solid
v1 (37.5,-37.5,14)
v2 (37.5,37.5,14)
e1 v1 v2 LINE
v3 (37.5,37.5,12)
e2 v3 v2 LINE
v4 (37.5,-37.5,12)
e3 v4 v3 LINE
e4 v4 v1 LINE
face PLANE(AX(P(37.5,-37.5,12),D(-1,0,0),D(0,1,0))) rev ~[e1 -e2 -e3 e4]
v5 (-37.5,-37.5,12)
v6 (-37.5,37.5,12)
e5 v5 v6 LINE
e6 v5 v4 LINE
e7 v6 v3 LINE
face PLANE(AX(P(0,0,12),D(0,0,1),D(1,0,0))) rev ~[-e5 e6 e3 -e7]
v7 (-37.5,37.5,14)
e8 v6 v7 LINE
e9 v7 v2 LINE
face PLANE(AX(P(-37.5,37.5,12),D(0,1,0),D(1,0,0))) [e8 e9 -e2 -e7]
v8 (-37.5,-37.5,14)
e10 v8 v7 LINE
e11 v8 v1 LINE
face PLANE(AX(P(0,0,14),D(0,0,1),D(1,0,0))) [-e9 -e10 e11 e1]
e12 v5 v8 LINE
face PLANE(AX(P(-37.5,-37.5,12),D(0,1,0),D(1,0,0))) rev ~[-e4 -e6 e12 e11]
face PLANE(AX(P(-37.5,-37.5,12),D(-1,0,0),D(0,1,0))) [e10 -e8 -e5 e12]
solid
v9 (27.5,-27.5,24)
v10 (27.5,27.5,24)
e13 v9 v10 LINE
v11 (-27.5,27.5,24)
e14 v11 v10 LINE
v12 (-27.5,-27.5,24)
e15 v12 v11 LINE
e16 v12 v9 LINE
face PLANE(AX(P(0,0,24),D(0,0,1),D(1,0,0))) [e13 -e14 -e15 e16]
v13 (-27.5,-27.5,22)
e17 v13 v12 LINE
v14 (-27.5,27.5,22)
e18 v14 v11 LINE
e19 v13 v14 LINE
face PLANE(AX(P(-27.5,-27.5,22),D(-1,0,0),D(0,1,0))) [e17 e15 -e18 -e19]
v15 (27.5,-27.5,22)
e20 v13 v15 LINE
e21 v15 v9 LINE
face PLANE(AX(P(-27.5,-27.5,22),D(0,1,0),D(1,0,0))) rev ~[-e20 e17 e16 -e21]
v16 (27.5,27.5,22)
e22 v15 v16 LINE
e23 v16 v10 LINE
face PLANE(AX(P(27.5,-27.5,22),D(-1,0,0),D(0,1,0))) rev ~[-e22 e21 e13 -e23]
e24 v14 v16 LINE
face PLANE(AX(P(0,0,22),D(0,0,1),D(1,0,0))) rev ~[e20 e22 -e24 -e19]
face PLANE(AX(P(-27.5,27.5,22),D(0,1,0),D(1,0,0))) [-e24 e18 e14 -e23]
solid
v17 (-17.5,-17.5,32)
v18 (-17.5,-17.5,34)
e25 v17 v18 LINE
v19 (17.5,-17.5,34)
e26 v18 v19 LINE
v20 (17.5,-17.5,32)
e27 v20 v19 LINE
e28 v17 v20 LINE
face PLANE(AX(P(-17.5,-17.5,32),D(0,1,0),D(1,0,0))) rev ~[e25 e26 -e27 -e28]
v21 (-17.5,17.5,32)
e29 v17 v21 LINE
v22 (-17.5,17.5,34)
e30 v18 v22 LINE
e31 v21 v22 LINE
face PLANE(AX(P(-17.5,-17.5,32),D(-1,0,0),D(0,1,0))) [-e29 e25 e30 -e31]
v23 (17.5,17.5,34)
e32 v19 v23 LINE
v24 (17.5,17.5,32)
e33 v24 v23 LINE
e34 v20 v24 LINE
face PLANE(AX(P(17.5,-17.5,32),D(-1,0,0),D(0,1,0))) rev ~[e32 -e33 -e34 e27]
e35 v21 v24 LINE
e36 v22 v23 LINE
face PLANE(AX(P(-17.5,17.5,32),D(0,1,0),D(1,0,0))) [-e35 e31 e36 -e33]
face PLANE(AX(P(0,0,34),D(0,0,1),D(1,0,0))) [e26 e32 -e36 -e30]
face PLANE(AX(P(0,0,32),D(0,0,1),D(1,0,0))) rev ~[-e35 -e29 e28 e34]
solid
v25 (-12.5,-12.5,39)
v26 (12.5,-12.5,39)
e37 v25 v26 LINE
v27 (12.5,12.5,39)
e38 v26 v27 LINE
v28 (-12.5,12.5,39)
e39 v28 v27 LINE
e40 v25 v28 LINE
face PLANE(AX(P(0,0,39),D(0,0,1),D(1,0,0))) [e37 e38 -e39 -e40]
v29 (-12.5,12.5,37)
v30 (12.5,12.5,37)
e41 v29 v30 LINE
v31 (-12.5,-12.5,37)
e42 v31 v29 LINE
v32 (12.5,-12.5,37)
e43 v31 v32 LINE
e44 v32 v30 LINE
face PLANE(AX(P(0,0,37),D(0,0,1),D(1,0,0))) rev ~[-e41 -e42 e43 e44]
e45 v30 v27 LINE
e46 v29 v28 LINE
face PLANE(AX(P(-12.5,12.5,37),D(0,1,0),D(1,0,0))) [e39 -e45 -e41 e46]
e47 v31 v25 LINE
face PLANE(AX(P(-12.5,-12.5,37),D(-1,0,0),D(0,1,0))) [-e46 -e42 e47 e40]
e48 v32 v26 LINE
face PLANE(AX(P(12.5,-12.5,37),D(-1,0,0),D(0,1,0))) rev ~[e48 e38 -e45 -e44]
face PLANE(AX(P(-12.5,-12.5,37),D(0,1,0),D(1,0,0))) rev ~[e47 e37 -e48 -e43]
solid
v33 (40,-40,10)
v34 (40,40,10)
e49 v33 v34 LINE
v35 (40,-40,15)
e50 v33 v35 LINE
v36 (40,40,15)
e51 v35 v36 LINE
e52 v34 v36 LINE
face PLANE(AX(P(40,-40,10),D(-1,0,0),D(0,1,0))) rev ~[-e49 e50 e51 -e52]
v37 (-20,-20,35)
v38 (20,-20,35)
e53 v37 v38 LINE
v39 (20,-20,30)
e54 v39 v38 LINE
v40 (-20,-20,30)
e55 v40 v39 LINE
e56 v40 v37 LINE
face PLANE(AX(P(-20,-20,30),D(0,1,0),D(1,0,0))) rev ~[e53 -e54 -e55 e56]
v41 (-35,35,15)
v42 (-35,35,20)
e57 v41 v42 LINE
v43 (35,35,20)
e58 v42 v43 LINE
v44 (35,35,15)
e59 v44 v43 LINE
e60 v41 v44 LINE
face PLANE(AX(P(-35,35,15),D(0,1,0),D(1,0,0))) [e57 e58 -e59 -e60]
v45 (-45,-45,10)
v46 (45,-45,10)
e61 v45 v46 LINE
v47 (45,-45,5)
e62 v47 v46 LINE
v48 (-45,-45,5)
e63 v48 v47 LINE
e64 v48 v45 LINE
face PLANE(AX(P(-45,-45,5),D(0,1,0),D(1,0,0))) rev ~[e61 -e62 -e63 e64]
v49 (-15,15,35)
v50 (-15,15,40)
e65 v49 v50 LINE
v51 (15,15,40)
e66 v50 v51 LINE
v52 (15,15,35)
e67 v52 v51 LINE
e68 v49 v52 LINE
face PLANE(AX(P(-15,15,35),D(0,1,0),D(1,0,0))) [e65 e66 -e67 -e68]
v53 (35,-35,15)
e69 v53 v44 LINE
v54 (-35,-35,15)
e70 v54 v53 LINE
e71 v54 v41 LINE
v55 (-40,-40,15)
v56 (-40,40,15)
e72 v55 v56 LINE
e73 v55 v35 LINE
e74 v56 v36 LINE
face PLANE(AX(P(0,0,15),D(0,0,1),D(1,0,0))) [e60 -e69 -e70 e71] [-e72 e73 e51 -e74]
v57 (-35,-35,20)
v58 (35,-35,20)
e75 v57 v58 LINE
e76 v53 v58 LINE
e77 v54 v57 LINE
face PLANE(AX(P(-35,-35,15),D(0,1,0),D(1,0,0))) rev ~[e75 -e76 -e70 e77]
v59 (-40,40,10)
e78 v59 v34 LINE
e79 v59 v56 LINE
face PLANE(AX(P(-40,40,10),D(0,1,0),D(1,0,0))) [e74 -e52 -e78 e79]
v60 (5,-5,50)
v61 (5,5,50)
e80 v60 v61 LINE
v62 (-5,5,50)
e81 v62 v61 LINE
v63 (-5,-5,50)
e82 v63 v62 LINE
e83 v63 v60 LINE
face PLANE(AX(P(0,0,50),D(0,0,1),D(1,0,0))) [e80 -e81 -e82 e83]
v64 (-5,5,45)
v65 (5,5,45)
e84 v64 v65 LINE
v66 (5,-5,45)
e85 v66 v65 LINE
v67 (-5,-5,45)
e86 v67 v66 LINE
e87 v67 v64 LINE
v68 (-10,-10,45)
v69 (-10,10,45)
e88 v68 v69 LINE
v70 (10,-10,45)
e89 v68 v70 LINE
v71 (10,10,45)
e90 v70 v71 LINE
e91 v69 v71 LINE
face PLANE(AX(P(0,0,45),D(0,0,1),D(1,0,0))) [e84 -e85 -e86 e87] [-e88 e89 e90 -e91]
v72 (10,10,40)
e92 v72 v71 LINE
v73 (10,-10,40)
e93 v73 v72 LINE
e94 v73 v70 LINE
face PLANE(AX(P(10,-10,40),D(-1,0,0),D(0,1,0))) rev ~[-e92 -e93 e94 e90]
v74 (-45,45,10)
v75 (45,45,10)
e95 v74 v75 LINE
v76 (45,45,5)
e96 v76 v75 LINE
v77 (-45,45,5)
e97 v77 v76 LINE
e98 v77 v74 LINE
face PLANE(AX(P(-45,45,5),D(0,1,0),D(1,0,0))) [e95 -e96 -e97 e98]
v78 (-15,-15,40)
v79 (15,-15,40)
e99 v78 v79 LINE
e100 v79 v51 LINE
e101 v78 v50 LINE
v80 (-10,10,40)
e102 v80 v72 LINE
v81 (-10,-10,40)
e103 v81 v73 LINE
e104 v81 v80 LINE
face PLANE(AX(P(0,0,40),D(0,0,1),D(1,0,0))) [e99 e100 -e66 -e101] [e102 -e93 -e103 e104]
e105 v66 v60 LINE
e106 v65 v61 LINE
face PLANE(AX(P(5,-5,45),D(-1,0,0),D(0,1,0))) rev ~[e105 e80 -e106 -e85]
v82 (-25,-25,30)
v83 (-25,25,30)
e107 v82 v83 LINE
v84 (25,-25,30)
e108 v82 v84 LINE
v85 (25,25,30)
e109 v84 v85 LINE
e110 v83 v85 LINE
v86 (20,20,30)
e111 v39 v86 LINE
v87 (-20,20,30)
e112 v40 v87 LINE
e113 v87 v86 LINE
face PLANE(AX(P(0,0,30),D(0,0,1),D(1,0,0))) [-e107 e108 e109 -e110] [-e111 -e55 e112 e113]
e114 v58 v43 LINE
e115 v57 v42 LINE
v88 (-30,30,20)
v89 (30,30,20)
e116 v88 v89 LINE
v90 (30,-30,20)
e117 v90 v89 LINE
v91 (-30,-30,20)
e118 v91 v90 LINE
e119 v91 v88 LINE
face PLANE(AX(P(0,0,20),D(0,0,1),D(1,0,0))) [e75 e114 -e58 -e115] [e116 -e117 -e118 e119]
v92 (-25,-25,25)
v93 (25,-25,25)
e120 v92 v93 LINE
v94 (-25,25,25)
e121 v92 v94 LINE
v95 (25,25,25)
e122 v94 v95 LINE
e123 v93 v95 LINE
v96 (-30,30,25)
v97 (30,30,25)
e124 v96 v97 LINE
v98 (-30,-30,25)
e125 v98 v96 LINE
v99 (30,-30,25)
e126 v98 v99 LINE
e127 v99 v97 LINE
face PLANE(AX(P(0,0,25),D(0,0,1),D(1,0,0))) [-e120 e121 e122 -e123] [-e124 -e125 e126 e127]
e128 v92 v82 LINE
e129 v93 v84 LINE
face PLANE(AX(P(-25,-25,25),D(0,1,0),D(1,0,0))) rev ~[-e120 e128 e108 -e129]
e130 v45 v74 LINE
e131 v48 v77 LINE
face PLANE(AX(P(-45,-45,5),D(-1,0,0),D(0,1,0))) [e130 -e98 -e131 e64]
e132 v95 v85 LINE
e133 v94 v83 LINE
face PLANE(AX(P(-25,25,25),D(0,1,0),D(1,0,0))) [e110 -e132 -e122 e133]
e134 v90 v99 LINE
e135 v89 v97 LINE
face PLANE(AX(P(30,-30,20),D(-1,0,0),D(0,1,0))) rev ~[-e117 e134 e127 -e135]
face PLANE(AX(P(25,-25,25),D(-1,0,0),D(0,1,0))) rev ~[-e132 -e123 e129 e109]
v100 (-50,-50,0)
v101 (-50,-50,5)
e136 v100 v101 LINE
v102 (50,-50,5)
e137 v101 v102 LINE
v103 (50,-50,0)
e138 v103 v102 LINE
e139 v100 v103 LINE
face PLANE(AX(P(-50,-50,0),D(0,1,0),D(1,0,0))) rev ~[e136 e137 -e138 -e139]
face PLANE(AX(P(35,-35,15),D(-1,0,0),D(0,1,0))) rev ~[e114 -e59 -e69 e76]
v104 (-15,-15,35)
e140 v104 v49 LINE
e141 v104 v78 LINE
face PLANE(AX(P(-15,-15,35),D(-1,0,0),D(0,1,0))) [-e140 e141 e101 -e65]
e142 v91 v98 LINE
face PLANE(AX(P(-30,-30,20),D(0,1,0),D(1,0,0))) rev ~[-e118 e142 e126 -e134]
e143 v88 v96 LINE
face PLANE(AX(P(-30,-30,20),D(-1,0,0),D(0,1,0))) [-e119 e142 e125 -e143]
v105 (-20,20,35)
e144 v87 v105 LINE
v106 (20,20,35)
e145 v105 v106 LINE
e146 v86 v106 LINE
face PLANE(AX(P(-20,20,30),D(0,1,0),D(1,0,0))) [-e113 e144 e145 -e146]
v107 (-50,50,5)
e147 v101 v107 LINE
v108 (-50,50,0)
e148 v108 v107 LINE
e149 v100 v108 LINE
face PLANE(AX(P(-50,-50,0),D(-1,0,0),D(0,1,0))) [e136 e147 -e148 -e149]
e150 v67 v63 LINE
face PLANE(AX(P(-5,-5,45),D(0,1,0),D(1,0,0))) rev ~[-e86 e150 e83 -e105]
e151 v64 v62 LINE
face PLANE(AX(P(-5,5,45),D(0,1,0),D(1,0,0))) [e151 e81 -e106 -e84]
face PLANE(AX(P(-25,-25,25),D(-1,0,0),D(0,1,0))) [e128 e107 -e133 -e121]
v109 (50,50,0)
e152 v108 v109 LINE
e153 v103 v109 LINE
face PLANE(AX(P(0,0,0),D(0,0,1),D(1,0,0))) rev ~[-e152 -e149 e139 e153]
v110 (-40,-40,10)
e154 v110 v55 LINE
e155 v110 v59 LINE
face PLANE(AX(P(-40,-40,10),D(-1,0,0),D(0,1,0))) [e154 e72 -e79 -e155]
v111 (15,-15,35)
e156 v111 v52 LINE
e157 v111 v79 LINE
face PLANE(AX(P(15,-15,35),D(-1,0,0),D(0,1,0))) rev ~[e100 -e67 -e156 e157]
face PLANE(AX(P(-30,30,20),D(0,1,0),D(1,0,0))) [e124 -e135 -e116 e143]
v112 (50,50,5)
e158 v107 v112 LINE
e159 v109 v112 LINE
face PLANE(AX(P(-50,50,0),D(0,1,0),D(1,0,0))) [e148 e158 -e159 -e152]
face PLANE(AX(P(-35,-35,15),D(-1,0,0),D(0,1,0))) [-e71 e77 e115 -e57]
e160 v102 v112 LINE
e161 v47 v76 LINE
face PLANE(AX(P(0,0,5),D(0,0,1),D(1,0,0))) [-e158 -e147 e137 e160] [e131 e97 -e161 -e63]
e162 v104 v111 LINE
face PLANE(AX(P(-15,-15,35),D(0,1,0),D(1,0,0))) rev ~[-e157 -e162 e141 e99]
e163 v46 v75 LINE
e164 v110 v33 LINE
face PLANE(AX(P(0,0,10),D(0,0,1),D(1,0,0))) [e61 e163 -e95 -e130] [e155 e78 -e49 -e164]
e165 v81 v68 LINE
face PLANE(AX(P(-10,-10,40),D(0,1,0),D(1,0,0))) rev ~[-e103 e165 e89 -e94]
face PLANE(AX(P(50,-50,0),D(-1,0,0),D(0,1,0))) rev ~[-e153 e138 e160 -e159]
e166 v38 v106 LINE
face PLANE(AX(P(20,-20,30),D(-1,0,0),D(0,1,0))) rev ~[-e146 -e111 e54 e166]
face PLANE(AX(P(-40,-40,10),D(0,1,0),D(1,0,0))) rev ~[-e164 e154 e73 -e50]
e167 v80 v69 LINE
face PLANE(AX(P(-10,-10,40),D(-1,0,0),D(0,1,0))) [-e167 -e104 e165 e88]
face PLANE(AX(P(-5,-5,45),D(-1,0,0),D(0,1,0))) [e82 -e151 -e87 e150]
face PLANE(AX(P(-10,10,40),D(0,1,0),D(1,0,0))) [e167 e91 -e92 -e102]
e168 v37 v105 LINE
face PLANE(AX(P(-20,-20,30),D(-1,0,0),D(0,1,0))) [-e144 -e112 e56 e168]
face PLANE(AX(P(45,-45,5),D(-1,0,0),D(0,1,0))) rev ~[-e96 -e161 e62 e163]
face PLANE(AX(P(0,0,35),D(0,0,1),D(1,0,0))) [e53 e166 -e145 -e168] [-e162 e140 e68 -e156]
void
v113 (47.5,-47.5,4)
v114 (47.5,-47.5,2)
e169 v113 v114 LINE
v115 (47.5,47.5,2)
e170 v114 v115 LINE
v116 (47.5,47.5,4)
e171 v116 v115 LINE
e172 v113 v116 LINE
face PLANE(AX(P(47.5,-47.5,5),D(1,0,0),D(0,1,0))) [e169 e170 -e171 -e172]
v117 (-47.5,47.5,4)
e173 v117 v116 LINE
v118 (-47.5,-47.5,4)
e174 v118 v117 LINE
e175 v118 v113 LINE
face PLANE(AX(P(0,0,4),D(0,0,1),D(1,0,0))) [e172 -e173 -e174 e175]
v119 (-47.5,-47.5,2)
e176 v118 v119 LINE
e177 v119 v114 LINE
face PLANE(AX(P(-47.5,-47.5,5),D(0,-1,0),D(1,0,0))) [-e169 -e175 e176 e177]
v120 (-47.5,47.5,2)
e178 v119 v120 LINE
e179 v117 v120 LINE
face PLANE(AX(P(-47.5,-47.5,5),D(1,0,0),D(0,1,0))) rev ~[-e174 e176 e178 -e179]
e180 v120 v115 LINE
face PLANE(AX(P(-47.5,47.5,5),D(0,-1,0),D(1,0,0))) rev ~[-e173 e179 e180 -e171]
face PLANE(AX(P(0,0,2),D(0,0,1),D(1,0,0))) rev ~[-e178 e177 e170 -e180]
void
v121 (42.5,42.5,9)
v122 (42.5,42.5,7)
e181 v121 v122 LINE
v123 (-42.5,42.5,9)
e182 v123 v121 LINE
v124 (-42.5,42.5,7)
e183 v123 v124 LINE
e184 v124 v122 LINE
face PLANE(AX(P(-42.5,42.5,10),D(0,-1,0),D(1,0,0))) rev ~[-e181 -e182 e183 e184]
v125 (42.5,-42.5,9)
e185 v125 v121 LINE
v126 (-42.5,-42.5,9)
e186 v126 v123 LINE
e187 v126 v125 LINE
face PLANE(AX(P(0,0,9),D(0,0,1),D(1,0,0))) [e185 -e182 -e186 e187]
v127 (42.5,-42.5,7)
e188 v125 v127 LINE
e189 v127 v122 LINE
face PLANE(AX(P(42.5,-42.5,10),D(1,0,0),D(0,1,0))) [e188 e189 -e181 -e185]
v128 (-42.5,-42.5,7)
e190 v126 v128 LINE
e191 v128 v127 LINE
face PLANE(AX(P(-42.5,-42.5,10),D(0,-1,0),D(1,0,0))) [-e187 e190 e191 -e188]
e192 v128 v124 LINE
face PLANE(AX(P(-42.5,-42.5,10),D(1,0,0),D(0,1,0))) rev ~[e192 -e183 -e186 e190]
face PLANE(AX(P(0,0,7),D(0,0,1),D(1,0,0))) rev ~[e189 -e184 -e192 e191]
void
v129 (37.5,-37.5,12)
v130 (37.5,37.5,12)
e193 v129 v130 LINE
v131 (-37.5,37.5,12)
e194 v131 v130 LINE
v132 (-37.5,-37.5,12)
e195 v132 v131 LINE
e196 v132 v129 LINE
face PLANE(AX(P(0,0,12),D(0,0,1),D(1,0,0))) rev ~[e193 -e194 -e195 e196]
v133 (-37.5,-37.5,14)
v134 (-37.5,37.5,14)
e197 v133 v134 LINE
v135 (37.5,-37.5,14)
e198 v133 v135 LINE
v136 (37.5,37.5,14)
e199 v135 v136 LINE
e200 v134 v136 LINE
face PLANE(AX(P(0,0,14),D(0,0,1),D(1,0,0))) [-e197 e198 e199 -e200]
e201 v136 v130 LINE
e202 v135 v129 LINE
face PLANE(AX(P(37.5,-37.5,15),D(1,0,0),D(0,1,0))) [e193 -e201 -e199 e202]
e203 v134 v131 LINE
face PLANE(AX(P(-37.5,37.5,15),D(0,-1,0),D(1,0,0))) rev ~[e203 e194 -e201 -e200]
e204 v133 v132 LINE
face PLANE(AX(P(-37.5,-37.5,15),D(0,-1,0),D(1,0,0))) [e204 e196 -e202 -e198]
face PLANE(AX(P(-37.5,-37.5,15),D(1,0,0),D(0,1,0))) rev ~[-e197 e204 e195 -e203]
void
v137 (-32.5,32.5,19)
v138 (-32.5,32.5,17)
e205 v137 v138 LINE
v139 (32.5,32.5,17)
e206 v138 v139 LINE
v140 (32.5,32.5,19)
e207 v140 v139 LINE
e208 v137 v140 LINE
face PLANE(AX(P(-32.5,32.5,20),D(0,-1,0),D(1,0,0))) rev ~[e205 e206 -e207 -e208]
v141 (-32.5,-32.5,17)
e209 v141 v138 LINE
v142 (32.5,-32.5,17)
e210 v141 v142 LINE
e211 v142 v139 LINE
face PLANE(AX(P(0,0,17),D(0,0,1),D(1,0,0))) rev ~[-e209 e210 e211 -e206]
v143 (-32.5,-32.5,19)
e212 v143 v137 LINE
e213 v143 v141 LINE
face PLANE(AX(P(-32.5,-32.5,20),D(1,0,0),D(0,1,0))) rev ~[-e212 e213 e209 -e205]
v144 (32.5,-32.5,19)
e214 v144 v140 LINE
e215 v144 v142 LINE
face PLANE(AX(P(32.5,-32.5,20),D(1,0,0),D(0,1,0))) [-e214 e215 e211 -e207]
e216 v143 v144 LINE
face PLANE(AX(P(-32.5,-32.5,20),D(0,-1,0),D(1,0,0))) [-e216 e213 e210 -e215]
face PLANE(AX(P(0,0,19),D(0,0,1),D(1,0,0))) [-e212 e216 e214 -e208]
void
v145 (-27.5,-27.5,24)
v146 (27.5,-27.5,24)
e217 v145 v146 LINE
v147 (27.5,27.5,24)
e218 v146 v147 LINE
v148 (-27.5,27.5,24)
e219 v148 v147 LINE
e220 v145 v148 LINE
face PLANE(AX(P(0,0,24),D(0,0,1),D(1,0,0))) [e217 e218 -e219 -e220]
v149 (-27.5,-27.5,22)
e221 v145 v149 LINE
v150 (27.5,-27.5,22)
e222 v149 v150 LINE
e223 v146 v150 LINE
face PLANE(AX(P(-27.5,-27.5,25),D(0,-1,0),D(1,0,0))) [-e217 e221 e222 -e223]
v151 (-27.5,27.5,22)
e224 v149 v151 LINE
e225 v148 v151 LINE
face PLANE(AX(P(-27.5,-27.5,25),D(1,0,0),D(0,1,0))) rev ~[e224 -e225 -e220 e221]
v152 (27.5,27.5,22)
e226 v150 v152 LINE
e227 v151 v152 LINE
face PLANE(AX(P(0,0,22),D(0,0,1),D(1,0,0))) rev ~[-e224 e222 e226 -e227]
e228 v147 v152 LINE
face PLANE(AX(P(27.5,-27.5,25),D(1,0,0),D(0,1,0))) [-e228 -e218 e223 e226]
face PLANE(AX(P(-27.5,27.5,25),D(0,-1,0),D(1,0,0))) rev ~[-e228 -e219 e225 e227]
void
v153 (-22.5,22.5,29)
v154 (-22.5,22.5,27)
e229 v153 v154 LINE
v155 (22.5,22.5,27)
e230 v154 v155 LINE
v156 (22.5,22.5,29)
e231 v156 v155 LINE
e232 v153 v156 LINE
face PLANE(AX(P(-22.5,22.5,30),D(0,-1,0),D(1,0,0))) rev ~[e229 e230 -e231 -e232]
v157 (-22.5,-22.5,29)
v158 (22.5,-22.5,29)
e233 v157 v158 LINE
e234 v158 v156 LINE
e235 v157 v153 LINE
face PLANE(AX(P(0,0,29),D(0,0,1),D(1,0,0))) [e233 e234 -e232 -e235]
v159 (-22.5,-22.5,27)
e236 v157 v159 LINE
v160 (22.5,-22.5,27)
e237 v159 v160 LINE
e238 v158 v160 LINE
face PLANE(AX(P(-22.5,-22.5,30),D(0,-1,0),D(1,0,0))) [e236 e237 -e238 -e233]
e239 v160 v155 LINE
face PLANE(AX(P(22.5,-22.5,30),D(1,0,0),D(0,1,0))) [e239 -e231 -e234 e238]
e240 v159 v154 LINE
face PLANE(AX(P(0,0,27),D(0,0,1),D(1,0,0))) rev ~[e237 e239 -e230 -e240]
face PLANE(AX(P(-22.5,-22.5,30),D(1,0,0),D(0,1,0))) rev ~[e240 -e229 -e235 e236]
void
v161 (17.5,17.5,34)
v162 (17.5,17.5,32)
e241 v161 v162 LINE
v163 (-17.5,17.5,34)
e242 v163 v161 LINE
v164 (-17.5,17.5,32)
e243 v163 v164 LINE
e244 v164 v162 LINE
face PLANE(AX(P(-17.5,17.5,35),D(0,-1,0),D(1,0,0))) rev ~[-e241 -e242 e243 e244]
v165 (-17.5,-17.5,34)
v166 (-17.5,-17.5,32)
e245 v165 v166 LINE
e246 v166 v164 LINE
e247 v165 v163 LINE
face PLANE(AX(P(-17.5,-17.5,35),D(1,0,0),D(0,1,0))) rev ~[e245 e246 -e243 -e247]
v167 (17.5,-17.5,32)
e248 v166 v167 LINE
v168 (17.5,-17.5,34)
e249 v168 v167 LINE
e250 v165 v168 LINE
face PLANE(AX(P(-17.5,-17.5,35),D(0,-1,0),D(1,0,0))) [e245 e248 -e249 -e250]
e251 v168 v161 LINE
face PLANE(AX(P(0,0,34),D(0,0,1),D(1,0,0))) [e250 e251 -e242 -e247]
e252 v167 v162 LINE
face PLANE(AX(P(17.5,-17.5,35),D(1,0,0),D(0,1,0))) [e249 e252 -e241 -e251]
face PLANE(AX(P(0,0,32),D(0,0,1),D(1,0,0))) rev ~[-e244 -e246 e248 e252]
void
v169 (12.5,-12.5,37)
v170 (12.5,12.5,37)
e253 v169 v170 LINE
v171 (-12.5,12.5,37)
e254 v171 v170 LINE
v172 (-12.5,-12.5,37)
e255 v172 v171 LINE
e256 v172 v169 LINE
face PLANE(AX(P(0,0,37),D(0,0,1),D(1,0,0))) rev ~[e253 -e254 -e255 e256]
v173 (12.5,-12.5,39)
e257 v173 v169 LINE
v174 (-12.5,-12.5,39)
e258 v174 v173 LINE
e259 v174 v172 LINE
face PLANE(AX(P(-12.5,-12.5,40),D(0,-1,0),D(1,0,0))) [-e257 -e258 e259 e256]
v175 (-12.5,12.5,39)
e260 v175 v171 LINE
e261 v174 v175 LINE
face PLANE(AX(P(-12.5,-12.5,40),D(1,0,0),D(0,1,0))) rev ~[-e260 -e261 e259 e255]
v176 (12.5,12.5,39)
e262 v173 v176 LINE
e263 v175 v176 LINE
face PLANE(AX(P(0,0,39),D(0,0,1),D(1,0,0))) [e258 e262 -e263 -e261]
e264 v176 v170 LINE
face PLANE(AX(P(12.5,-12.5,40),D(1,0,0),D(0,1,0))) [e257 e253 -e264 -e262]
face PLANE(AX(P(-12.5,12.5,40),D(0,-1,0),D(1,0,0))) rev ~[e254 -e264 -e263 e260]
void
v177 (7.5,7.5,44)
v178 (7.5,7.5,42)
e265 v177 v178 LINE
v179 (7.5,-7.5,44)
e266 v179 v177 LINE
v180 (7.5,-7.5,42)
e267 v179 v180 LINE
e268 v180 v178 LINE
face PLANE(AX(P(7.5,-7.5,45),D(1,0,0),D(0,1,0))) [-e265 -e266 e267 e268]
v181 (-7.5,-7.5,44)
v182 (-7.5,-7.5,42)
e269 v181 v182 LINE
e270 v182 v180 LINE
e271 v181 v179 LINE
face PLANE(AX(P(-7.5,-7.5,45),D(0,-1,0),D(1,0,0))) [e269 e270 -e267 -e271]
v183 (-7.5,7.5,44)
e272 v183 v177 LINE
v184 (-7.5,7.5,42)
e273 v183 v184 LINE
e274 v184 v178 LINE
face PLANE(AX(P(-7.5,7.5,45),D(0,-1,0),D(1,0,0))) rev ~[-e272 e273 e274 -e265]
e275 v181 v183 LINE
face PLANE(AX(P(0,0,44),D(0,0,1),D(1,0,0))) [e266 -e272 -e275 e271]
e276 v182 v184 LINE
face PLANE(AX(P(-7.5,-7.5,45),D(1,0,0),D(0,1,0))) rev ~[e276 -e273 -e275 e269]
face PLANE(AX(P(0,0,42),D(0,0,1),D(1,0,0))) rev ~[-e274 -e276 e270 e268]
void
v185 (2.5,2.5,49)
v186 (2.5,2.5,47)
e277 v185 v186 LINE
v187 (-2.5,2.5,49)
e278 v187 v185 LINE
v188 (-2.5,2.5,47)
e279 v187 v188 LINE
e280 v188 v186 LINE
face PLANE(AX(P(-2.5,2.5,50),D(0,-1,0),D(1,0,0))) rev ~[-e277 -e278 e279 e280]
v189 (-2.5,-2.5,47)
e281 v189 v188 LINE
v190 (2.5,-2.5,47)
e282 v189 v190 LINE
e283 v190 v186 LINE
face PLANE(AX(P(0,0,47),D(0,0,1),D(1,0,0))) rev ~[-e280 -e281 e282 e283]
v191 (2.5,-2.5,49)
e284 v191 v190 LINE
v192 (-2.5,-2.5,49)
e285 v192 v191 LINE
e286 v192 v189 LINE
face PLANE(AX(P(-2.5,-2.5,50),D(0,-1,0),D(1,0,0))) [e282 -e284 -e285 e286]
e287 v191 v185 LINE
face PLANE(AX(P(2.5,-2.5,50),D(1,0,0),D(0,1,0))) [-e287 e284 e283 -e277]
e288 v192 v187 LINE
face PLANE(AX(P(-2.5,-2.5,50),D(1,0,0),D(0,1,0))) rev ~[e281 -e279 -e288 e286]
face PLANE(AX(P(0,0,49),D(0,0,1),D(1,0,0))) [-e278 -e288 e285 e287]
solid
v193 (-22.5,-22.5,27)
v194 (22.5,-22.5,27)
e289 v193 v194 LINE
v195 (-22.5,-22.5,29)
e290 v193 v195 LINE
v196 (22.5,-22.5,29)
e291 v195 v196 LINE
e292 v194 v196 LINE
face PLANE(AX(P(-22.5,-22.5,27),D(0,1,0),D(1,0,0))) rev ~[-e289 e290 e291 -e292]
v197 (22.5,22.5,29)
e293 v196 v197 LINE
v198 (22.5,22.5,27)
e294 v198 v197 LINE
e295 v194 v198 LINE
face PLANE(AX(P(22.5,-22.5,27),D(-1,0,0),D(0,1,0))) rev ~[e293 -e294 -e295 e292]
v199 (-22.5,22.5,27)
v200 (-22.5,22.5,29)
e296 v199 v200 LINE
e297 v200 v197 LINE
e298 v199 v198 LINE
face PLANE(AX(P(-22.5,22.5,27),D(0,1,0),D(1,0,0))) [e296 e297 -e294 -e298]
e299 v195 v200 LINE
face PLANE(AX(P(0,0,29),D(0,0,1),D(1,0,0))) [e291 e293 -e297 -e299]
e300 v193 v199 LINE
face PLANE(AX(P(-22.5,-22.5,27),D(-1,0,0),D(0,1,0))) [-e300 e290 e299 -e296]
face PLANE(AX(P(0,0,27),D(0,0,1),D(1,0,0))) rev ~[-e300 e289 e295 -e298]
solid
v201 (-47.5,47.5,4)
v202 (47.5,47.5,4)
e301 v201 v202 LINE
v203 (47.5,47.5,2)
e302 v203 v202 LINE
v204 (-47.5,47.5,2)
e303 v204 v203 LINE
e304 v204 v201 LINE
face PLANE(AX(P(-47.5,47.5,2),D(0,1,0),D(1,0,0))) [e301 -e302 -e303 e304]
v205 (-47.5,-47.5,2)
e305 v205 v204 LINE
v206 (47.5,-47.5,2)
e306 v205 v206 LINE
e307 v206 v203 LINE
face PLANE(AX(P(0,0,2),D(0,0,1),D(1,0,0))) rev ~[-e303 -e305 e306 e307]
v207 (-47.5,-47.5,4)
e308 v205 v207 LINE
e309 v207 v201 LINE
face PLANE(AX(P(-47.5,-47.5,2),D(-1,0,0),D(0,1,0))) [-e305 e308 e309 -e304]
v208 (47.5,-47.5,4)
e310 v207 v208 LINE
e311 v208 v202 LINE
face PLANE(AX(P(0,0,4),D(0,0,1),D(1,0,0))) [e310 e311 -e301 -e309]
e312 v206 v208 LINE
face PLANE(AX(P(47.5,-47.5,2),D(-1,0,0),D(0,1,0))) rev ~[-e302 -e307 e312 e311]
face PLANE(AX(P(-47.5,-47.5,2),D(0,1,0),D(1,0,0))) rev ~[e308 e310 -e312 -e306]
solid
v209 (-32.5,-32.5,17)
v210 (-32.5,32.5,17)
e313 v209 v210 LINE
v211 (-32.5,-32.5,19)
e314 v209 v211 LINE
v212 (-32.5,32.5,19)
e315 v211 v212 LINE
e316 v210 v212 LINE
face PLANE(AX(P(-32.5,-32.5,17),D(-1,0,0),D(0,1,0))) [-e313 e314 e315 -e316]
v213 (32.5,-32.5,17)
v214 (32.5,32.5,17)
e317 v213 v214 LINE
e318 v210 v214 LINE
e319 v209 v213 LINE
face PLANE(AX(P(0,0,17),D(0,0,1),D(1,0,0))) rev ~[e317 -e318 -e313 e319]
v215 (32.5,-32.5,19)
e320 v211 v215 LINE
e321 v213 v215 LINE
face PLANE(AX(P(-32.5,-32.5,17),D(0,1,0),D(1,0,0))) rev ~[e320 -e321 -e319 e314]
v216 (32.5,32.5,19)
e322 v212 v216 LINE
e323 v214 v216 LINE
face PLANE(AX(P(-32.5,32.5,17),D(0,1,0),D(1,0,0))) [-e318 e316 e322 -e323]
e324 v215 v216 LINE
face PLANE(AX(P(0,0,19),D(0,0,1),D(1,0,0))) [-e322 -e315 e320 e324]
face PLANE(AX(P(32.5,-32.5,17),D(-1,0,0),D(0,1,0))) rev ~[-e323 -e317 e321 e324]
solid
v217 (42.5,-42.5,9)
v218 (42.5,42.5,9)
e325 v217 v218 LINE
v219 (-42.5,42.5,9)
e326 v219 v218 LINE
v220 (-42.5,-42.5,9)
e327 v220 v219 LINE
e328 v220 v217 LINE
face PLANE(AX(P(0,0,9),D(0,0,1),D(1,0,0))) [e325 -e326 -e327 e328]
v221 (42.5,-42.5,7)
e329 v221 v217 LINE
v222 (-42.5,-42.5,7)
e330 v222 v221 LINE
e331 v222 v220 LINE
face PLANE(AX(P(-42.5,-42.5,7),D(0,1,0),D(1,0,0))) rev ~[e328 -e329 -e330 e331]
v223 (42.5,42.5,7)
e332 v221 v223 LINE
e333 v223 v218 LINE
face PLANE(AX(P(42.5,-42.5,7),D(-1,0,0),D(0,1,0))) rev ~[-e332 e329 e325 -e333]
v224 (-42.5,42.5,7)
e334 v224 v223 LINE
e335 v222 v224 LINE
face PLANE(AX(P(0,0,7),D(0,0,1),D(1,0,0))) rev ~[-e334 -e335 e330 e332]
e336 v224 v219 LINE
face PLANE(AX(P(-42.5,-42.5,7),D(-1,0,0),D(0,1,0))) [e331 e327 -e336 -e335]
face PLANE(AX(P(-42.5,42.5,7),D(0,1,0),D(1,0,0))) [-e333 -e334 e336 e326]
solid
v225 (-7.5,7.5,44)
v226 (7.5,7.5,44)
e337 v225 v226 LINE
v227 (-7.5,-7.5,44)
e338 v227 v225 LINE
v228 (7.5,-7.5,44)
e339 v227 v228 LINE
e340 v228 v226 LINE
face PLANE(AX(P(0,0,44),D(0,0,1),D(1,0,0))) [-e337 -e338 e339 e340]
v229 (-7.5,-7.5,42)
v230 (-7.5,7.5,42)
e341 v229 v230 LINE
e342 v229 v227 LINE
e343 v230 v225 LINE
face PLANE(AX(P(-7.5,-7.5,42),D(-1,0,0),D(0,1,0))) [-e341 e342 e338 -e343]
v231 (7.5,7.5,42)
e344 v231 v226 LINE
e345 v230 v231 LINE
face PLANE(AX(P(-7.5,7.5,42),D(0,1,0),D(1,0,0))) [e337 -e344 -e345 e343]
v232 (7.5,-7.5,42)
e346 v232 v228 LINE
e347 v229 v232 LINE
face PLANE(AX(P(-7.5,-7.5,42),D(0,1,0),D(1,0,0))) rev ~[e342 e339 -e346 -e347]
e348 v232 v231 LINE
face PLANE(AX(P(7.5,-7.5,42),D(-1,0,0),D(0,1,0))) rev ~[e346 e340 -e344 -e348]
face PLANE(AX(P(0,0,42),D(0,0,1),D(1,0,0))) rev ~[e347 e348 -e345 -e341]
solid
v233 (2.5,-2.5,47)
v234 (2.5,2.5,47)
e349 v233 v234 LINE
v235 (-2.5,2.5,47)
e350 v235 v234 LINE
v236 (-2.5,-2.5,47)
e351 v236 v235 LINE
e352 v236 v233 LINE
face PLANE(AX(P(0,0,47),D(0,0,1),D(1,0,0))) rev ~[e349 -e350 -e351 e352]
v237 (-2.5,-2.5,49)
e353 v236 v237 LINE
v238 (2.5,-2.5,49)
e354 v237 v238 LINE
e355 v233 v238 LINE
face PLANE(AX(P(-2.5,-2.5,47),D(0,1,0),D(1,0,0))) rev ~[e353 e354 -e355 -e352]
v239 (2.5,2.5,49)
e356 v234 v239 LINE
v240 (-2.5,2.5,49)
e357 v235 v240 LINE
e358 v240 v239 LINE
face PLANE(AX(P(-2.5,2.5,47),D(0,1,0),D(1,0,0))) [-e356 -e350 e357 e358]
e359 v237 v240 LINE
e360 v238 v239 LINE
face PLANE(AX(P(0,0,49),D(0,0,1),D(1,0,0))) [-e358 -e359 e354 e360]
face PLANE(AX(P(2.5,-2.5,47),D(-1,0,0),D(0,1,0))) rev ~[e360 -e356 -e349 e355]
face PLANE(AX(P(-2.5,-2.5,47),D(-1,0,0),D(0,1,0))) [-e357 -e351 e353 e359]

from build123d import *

# Parameters (mm, degrees)
F0_W      = 100
F0_H      = 100
F1_DEPTH  = 5
F2_W      = 95
F2_H      = 95
F3_DEPTH  = 3
F4_W      = 95
F4_H      = 95
F5_DEPTH  = 2
F6_W      = 95
F6_H      = 95
F7_DEPTH  = 1
F8_W      = 90
F8_H      = 90
F9_DEPTH  = 5
F10_W     = 85
F10_H     = 85
F11_DEPTH = 3
F12_W     = 85
F12_H     = 85
F13_DEPTH = 2
F14_W     = 85
F14_H     = 85
F15_DEPTH = 1
F16_W     = 80
F16_H     = 80
F17_DEPTH = 5
F18_W     = 75
F18_H     = 75
F19_DEPTH = 3
F20_W     = 75
F20_H     = 75
F21_DEPTH = 2
F22_W     = 75
F22_H     = 75
F23_DEPTH = 1
F24_W     = 70
F24_H     = 70
F25_DEPTH = 5
F26_W     = 65
F26_H     = 65
F27_DEPTH = 3
F28_W     = 65
F28_H     = 65
F29_DEPTH = 2
F30_W     = 65
F30_H     = 65
F31_DEPTH = 1
F32_W     = 60
F32_H     = 60
F33_DEPTH = 5
F34_W     = 55
F34_H     = 55
F35_DEPTH = 3
F36_W     = 55
F36_H     = 55
F37_DEPTH = 2
F38_W     = 55
F38_H     = 55
F39_DEPTH = 1
F40_W     = 50
F40_H     = 50
F41_DEPTH = 5
F42_W     = 45
F42_H     = 45
F43_DEPTH = 3
F44_W     = 45
F44_H     = 45
F45_DEPTH = 2
F46_W     = 45
F46_H     = 45
F47_DEPTH = 1
F48_W     = 40
F48_H     = 40
F49_DEPTH = 5
F50_W     = 35
F50_H     = 35
F51_DEPTH = 3
F52_W     = 35
F52_H     = 35
F53_DEPTH = 2
F54_W     = 35
F54_H     = 35
F55_DEPTH = 1
F56_W     = 30
F56_H     = 30
F57_DEPTH = 5
F58_W     = 25
F58_H     = 25
F59_DEPTH = 3
F60_W     = 25
F60_H     = 25
F61_DEPTH = 2
F62_W     = 25
F62_H     = 25
F63_DEPTH = 1
F64_W     = 20
F64_H     = 20
F65_DEPTH = 5
F66_W     = 15
F66_H     = 15
F67_DEPTH = 3
F68_W     = 15
F68_H     = 15
F69_DEPTH = 2
F70_W     = 15
F70_H     = 15
F71_DEPTH = 1
F72_W     = 10
F72_H     = 10
F73_DEPTH = 5
F74_W     = 5
F74_H     = 5
F75_DEPTH = 3
F76_W     = 5
F76_H     = 5
F77_DEPTH = 2
F78_W     = 5
F78_H     = 5
F79_DEPTH = 1


with BuildPart() as f1:
    # F0 (on Top) → F1 (new body)
    with BuildSketch(Plane.XY):
        Rectangle(F0_W, F0_H)
    extrude(amount=F1_DEPTH)

    # F2 (on face) → F3 (cut)
    with BuildSketch(Plane.XY.offset(5)):
        Rectangle(F2_W, F2_H)
    extrude(amount=-F3_DEPTH, mode=Mode.SUBTRACT)

    # F6 (on face) → F7 (join)
    with BuildSketch(Plane.XY.offset(4)):
        Rectangle(F6_W, F6_H)
    extrude(amount=F7_DEPTH)

    # F8 (on face) → F9 (join)
    with BuildSketch(Plane.XY.offset(5)):
        Rectangle(F8_W, F8_H)
    extrude(amount=F9_DEPTH)

    # F10 (on face) → F11 (cut)
    with BuildSketch(Plane.XY.offset(10)):
        Rectangle(F10_W, F10_H)
    extrude(amount=-F11_DEPTH, mode=Mode.SUBTRACT)

    # F14 (on face) → F15 (join)
    with BuildSketch(Plane.XY.offset(9)):
        Rectangle(F14_W, F14_H)
    extrude(amount=F15_DEPTH)

    # F16 (on face) → F17 (join)
    with BuildSketch(Plane.XY.offset(10)):
        Rectangle(F16_W, F16_H)
    extrude(amount=F17_DEPTH)

    # F18 (on face) → F19 (cut)
    with BuildSketch(Plane.XY.offset(15)):
        Rectangle(F18_W, F18_H)
    extrude(amount=-F19_DEPTH, mode=Mode.SUBTRACT)

    # F22 (on face) → F23 (join)
    with BuildSketch(Plane.XY.offset(14)):
        Rectangle(F22_W, F22_H)
    extrude(amount=F23_DEPTH)

    # F24 (on face) → F25 (join)
    with BuildSketch(Plane.XY.offset(15)):
        Rectangle(F24_W, F24_H)
    extrude(amount=F25_DEPTH)

    # F26 (on face) → F27 (cut)
    with BuildSketch(Plane.XY.offset(20)):
        Rectangle(F26_W, F26_H)
    extrude(amount=-F27_DEPTH, mode=Mode.SUBTRACT)

    # F30 (on face) → F31 (join)
    with BuildSketch(Plane.XY.offset(19)):
        Rectangle(F30_W, F30_H)
    extrude(amount=F31_DEPTH)

    # F32 (on face) → F33 (join)
    with BuildSketch(Plane.XY.offset(20)):
        Rectangle(F32_W, F32_H)
    extrude(amount=F33_DEPTH)

    # F34 (on face) → F35 (cut)
    with BuildSketch(Plane.XY.offset(25)):
        Rectangle(F34_W, F34_H)
    extrude(amount=-F35_DEPTH, mode=Mode.SUBTRACT)

    # F38 (on face) → F39 (join)
    with BuildSketch(Plane.XY.offset(24)):
        Rectangle(F38_W, F38_H)
    extrude(amount=F39_DEPTH)

    # F40 (on face) → F41 (join)
    with BuildSketch(Plane.XY.offset(25)):
        Rectangle(F40_W, F40_H)
    extrude(amount=F41_DEPTH)

    # F42 (on face) → F43 (cut)
    with BuildSketch(Plane.XY.offset(30)):
        Rectangle(F42_W, F42_H)
    extrude(amount=-F43_DEPTH, mode=Mode.SUBTRACT)

    # F46 (on face) → F47 (join)
    with BuildSketch(Plane.XY.offset(29)):
        Rectangle(F46_W, F46_H)
    extrude(amount=F47_DEPTH)

    # F48 (on face) → F49 (join)
    with BuildSketch(Plane.XY.offset(30)):
        Rectangle(F48_W, F48_H)
    extrude(amount=F49_DEPTH)

    # F50 (on face) → F51 (cut)
    with BuildSketch(Plane.XY.offset(35)):
        Rectangle(F50_W, F50_H)
    extrude(amount=-F51_DEPTH, mode=Mode.SUBTRACT)

    # F54 (on face) → F55 (join)
    with BuildSketch(Plane.XY.offset(34)):
        Rectangle(F54_W, F54_H)
    extrude(amount=F55_DEPTH)

    # F56 (on face) → F57 (join)
    with BuildSketch(Plane.XY.offset(35)):
        Rectangle(F56_W, F56_H)
    extrude(amount=F57_DEPTH)

    # F58 (on face) → F59 (cut)
    with BuildSketch(Plane.XY.offset(40)):
        Rectangle(F58_W, F58_H)
    extrude(amount=-F59_DEPTH, mode=Mode.SUBTRACT)

    # F62 (on face) → F63 (join)
    with BuildSketch(Plane.XY.offset(39)):
        Rectangle(F62_W, F62_H)
    extrude(amount=F63_DEPTH)

    # F64 (on face) → F65 (join)
    with BuildSketch(Plane.XY.offset(40)):
        Rectangle(F64_W, F64_H)
    extrude(amount=F65_DEPTH)

    # F66 (on face) → F67 (cut)
    with BuildSketch(Plane.XY.offset(45)):
        Rectangle(F66_W, F66_H)
    extrude(amount=-F67_DEPTH, mode=Mode.SUBTRACT)

    # F70 (on face) → F71 (join)
    with BuildSketch(Plane.XY.offset(44)):
        Rectangle(F70_W, F70_H)
    extrude(amount=F71_DEPTH)

    # F72 (on face) → F73 (join)
    with BuildSketch(Plane.XY.offset(45)):
        Rectangle(F72_W, F72_H)
    extrude(amount=F73_DEPTH)

    # F74 (on face) → F75 (cut)
    with BuildSketch(Plane.XY.offset(50)):
        Rectangle(F74_W, F74_H)
    extrude(amount=-F75_DEPTH, mode=Mode.SUBTRACT)

    # F78 (on face) → F79 (join)
    with BuildSketch(Plane.XY.offset(49)):
        Rectangle(F78_W, F78_H)
    extrude(amount=F79_DEPTH)


with BuildPart() as f5:
    # F4 (on face) → F5 (new body)
    with BuildSketch(Plane.XY.offset(2)):
        Rectangle(F4_W, F4_H)
    extrude(amount=F5_DEPTH)


with BuildPart() as f13:
    # F12 (on face) → F13 (new body)
    with BuildSketch(Plane.XY.offset(7)):
        Rectangle(F12_W, F12_H)
    extrude(amount=F13_DEPTH)


with BuildPart() as f21:
    # F20 (on face) → F21 (new body)
    with BuildSketch(Plane.XY.offset(12)):
        Rectangle(F20_W, F20_H)
    extrude(amount=F21_DEPTH)


with BuildPart() as f29:
    # F28 (on face) → F29 (new body)
    with BuildSketch(Plane.XY.offset(17)):
        Rectangle(F28_W, F28_H)
    extrude(amount=F29_DEPTH)


with BuildPart() as f37:
    # F36 (on face) → F37 (new body)
    with BuildSketch(Plane.XY.offset(22)):
        Rectangle(F36_W, F36_H)
    extrude(amount=F37_DEPTH)


with BuildPart() as f45:
    # F44 (on face) → F45 (new body)
    with BuildSketch(Plane.XY.offset(27)):
        Rectangle(F44_W, F44_H)
    extrude(amount=F45_DEPTH)


with BuildPart() as f53:
    # F52 (on face) → F53 (new body)
    with BuildSketch(Plane.XY.offset(32)):
        Rectangle(F52_W, F52_H)
    extrude(amount=F53_DEPTH)


with BuildPart() as f61:
    # F60 (on face) → F61 (new body)
    with BuildSketch(Plane.XY.offset(37)):
        Rectangle(F60_W, F60_H)
    extrude(amount=F61_DEPTH)


with BuildPart() as f69:
    # F68 (on face) → F69 (new body)
    with BuildSketch(Plane.XY.offset(42)):
        Rectangle(F68_W, F68_H)
    extrude(amount=F69_DEPTH)


with BuildPart() as f77:
    # F76 (on face) → F77 (new body)
    with BuildSketch(Plane.XY.offset(47)):
        Rectangle(F76_W, F76_H)
    extrude(amount=F77_DEPTH)


solid = Compound([f1.part, f5.part, f13.part, f21.part, f29.part, f37.part, f45.part, f53.part, f61.part, f69.part, f77.part])
